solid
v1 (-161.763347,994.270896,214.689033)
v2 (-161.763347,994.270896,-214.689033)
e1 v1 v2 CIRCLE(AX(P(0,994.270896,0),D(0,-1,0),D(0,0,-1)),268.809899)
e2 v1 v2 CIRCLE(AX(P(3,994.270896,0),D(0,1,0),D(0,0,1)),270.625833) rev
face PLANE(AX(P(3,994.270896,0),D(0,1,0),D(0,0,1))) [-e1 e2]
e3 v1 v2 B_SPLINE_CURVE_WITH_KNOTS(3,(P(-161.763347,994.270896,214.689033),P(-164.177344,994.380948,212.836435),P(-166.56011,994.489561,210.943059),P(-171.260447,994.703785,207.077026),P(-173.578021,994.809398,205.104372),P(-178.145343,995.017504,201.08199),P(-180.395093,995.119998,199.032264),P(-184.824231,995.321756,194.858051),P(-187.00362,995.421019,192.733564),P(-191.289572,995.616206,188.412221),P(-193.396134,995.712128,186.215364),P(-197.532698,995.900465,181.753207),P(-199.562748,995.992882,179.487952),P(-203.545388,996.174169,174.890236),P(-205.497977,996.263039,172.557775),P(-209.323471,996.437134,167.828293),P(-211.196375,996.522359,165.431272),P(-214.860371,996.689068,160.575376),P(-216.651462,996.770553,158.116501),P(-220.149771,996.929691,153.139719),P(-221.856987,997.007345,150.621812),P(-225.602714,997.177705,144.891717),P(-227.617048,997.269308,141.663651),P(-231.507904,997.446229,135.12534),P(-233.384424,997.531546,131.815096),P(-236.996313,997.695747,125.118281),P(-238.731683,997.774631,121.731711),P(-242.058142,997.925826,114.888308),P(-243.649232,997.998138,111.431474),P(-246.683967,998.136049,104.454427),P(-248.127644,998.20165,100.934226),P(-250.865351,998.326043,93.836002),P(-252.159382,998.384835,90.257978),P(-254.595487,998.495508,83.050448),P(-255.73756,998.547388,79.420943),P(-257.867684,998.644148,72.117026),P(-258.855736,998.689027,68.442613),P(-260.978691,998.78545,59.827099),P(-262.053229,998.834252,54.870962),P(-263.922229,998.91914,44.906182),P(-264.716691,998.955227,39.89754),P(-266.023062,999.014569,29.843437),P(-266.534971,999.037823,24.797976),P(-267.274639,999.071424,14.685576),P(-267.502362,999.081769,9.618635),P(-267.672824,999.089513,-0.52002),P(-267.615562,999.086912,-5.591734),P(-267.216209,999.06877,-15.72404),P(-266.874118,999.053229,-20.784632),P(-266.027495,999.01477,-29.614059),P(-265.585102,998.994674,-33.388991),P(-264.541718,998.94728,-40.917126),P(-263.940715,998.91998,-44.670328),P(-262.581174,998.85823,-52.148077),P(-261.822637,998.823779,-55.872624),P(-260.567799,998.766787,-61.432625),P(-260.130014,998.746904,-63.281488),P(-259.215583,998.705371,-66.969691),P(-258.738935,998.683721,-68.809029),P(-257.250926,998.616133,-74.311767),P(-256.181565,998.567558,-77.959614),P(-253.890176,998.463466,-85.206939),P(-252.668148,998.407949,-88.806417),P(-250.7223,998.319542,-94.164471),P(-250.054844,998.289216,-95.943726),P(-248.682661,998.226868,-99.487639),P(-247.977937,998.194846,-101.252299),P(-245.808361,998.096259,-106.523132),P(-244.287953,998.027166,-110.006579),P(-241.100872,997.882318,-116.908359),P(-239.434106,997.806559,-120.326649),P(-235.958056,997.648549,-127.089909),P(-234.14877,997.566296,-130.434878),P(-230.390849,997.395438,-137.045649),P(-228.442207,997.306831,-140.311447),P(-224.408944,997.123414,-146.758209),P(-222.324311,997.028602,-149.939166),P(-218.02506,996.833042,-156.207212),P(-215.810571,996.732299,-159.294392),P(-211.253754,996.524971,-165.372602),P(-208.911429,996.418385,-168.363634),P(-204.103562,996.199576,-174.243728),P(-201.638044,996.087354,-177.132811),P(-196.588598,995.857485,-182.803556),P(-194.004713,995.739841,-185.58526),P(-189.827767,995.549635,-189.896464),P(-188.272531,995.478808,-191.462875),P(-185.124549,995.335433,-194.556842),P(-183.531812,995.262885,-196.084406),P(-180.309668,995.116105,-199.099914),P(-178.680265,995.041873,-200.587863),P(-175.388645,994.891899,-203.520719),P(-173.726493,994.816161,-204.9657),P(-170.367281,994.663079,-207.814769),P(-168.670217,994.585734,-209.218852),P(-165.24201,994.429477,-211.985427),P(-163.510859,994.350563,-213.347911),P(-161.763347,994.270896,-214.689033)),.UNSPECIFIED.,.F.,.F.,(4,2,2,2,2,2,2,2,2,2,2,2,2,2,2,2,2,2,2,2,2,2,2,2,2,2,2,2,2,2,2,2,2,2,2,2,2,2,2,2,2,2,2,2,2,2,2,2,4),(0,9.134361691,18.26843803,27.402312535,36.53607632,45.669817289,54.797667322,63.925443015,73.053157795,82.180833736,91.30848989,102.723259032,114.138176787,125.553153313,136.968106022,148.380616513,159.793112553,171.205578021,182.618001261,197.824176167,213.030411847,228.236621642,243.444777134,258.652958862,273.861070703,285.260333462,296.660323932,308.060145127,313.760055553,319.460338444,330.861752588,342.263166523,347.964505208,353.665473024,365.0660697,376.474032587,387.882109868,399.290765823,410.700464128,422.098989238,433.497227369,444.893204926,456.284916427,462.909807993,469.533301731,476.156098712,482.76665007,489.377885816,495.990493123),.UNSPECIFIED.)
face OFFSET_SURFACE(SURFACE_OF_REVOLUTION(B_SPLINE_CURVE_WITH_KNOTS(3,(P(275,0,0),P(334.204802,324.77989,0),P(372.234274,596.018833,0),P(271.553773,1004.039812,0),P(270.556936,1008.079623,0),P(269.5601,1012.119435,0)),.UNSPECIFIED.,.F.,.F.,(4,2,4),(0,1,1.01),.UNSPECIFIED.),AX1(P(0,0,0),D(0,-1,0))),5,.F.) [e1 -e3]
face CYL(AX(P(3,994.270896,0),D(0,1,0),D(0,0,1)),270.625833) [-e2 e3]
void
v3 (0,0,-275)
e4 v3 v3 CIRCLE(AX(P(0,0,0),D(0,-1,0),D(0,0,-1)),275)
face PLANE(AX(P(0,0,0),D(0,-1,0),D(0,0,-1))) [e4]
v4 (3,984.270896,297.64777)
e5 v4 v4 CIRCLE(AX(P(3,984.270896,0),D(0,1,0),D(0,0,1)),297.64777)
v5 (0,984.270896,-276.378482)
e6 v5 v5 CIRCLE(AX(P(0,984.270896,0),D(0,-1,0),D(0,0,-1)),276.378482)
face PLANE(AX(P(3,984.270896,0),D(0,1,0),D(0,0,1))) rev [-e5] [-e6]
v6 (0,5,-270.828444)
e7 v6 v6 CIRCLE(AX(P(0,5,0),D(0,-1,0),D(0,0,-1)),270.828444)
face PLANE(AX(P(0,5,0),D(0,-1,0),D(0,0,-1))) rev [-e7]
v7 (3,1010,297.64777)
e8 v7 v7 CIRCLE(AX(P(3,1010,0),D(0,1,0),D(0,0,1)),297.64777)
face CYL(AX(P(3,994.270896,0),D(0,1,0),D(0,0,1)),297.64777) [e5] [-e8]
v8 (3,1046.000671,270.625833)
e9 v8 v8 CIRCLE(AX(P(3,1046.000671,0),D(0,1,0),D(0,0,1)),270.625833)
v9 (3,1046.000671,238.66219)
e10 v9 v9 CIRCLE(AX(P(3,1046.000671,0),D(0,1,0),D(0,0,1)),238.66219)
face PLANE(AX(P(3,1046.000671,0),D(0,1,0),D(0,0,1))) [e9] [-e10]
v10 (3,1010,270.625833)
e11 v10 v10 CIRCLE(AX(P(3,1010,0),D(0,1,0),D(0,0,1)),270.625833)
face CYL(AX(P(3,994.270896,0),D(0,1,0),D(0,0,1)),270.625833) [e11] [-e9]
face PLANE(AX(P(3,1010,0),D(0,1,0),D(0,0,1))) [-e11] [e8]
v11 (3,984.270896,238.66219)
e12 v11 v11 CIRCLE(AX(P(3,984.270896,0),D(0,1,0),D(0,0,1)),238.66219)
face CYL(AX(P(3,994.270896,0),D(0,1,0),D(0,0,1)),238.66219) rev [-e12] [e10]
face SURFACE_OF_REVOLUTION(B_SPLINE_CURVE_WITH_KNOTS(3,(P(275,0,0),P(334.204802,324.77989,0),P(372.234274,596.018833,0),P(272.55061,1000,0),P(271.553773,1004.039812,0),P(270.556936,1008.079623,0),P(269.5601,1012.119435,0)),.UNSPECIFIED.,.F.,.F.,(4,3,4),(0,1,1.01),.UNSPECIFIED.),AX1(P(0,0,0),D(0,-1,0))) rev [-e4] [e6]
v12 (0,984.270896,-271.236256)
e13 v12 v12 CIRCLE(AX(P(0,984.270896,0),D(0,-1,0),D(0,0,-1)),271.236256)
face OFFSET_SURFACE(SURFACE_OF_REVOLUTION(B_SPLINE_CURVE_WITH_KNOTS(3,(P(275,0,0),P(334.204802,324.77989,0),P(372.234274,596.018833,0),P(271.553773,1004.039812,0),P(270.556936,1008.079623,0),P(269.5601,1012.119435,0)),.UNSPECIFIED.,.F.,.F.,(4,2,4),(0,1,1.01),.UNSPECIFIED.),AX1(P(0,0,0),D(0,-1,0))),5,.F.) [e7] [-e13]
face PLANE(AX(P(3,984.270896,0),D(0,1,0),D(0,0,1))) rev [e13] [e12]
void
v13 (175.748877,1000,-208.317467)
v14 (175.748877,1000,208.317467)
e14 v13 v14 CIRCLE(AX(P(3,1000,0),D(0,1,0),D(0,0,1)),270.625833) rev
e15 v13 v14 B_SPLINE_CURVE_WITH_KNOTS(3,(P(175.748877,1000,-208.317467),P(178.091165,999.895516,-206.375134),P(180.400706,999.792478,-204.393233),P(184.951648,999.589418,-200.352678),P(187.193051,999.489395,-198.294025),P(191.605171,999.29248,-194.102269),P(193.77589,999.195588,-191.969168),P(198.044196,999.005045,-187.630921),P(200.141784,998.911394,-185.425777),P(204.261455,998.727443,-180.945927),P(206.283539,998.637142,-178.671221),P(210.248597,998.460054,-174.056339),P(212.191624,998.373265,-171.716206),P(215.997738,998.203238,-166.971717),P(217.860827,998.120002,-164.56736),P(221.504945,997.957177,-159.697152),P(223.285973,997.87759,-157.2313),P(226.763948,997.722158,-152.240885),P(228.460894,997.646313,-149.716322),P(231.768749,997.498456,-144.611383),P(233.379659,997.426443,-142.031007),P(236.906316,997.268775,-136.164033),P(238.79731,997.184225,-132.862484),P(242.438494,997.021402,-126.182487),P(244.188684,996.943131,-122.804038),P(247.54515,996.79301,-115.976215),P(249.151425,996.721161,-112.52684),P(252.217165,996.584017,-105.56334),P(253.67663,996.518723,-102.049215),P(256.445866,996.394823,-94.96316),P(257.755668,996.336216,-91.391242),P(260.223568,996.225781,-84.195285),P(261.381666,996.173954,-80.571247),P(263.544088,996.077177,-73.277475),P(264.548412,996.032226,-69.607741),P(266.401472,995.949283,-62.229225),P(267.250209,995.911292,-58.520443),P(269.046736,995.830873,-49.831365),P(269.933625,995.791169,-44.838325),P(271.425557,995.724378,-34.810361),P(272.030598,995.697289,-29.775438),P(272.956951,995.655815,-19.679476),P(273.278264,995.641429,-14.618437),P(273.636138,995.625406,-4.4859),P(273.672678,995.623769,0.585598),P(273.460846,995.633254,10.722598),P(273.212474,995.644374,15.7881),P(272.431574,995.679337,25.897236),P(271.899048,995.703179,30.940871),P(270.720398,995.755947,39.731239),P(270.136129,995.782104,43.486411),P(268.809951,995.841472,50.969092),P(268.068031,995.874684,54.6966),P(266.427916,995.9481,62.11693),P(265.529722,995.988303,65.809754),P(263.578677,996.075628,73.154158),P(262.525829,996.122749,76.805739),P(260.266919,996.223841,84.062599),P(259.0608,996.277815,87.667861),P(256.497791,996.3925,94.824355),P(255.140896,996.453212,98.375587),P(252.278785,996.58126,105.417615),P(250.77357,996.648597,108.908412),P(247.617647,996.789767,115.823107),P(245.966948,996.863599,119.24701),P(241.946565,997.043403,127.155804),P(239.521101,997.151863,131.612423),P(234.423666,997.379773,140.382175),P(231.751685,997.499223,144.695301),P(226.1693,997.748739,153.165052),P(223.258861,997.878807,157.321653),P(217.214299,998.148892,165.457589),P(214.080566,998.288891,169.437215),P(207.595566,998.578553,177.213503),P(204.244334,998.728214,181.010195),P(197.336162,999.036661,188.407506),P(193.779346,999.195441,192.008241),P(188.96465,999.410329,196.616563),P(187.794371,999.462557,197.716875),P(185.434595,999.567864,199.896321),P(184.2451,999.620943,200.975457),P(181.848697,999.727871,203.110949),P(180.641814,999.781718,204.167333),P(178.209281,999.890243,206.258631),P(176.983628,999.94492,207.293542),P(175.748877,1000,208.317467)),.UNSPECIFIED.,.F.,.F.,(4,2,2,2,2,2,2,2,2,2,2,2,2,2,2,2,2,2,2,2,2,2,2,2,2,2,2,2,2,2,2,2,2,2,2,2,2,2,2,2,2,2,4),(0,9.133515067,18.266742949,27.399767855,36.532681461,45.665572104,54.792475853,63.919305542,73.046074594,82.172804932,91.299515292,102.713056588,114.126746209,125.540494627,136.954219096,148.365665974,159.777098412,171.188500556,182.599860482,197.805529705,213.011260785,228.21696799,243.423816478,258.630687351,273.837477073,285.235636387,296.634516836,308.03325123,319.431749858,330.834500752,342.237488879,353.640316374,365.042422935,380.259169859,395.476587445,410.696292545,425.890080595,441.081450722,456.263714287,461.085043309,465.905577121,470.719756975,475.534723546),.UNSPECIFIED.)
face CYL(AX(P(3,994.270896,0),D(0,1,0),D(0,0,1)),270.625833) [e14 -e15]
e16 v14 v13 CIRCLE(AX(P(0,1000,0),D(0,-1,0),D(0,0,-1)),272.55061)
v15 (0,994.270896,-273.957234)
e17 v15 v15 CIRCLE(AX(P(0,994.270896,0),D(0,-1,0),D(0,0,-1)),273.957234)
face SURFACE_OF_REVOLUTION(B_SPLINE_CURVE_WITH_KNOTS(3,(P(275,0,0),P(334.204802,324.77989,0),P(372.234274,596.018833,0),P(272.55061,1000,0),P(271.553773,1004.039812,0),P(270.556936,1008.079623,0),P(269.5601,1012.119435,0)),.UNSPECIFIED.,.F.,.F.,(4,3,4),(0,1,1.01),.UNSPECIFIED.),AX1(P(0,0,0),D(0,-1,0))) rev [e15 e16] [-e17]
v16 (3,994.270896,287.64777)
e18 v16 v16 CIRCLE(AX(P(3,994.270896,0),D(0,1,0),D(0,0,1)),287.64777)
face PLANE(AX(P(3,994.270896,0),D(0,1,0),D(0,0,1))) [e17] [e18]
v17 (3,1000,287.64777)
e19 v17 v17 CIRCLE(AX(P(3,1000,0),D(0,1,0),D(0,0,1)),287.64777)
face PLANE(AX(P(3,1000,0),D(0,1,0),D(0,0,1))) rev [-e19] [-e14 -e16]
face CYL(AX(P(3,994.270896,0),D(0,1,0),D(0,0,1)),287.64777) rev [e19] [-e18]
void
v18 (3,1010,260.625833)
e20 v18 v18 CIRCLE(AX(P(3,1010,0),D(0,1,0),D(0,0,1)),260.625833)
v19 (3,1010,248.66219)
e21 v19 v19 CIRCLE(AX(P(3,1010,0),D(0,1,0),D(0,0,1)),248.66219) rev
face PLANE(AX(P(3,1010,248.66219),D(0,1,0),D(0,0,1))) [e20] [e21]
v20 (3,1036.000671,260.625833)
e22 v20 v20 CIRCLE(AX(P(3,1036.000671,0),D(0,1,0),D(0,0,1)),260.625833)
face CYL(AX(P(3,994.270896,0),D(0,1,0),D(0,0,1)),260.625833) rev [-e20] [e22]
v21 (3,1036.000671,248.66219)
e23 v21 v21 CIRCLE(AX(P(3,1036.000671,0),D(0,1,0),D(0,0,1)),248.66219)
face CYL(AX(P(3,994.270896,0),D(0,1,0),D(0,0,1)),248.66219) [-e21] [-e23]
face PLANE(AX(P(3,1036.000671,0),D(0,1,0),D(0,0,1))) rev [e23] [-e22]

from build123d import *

# Parameters (mm, degrees)
SHELL5_T                    = -5
REVOLVE_THIN1_START         = 984.270895849
REVOLVE_THIN1_OUTLINE_R     = 260.625833246
REVOLVE_THIN1_OUTLINE_R_2   = 248.662190358
REVOLVE_THIN1_OUTLINE_R_3   = 238.662190358
REVOLVE_THIN1_DEPTH         = 61.729775532
REVOLVE_THIN1_2_OUTLINE_R   = 297.647770332
REVOLVE_THIN1_2_OUTLINE_R_2 = 287.647770332
REVOLVE_THIN1_2_OUTLINE_R_3 = 260.625833246
REVOLVE_THIN1_2_OUTLINE_R_4 = 248.662190358
REVOLVE_THIN1_2_DEPTH       = 25.729104151
REVOLVE_THIN1_3_OUTLINE_R   = 287.647770332
REVOLVE_THIN1_3_DEPTH       = 10
REVOLVE_THIN1_START_2       = 1000
REVOLVE_THIN1_4_OUTLINE_R   = 287.647770332
REVOLVE_THIN1_4_DEPTH       = 10
REVOLVE_THIN1_START_3       = 1036.000671381
REVOLVE_THIN1_5_OUTLINE_R   = 260.625833246
REVOLVE_THIN1_5_OUTLINE_R_2 = 248.662190358
REVOLVE_THIN1_5_DEPTH       = 10


# Read off the part's stored shape, not the designer's step: Revolve-Thin1
with BuildPart() as part:
    # Sketch1 → Revolve1 (revolve)
    with BuildSketch(Plane.XY):
        with BuildLine():
            Line((0, 0), (275, 0))
            add(Edge.make_bspline(
                [(275, 0), (334.204802315, 324.77989034), (372.23427441, 596.018832728), (272.550609758, 1000)],
                knots=[0, 0, 0, 0, 1, 1, 1, 1], degree=3))
            Line((272.550609758, 1000), (0, 1000))
            Line((0, 1000), (0, 0))
        make_face()
    revolve(axis=Axis((0, 0, 0), (0, 1, 0)))

    # Shell5
    shell5_openings = [part.faces().sort_by_distance(p)[0] for p in [
        (0, 1000, 0),
    ]]
    offset(amount=SHELL5_T, openings=shell5_openings, kind=Kind.INTERSECTION)

    # Revolve-Thin1 outline → Revolve-Thin1 (add)
    # profile 1 of 2: a face of its own
    with BuildSketch(Plane(origin=(0, 0, 0), x_dir=(1, 0, 0), z_dir=(0, 1, 0)).offset(REVOLVE_THIN1_START)):
        with BuildLine():
            ThreePointArc((-161.763347416, -214.689033182), (273.625833246, 0), (-161.763347416, 214.689033182))
            ThreePointArc((-161.763347416, 214.689033182), (-267.625833246, 0), (-161.763347416, -214.689033182))
        make_face()
        with Locations((3, 0)):
            Circle(REVOLVE_THIN1_OUTLINE_R, mode=Mode.SUBTRACT)
    # profile 2 of 2: a face of its own
    with BuildSketch(Plane(origin=(0, 0, 0), x_dir=(1, 0, 0), z_dir=(0, 1, 0)).offset(REVOLVE_THIN1_START)):
        with Locations((3, 0)):
            Circle(REVOLVE_THIN1_OUTLINE_R_2)
        with Locations((3, 0)):
            Circle(REVOLVE_THIN1_OUTLINE_R_3, mode=Mode.SUBTRACT)
    extrude(amount=REVOLVE_THIN1_DEPTH)

    # Revolve-Thin1 2 outline → Revolve-Thin1 2 (add)
    # profile 1 of 2: a face of its own
    with BuildSketch(Plane(origin=(0, 0, 0), x_dir=(1, 0, 0), z_dir=(0, 1, 0)).offset(REVOLVE_THIN1_START)):
        with Locations((3, 0)):
            Circle(REVOLVE_THIN1_2_OUTLINE_R)
        with Locations((3, 0)):
            Circle(REVOLVE_THIN1_2_OUTLINE_R_2, mode=Mode.SUBTRACT)
    # profile 2 of 2: a face of its own
    with BuildSketch(Plane(origin=(0, 0, 0), x_dir=(1, 0, 0), z_dir=(0, 1, 0)).offset(REVOLVE_THIN1_START)):
        with Locations((3, 0)):
            Circle(REVOLVE_THIN1_2_OUTLINE_R_3)
        with Locations((3, 0)):
            Circle(REVOLVE_THIN1_2_OUTLINE_R_4, mode=Mode.SUBTRACT)
    extrude(amount=REVOLVE_THIN1_2_DEPTH)

    # Revolve-Thin1 3 outline → Revolve-Thin1 3 (add)
    with BuildSketch(Plane(origin=(0, 0, 0), x_dir=(1, 0, 0), z_dir=(0, 1, 0)).offset(REVOLVE_THIN1_START)):
        with Locations((3, 0)):
            Circle(REVOLVE_THIN1_3_OUTLINE_R)
        with BuildLine():
            ThreePointArc((-161.763347415, -214.689033181), (-267.625833246, 0), (-161.763347415, 214.689033181))
            ThreePointArc((-161.763347415, 214.689033181), (273.625833246, 0), (-161.763347415, -214.689033181))
        make_face(mode=Mode.SUBTRACT)
    extrude(amount=REVOLVE_THIN1_3_DEPTH)

    # Revolve-Thin1 4 outline → Revolve-Thin1 4 (add)
    with BuildSketch(Plane(origin=(0, 0, 0), x_dir=(1, 0, 0), z_dir=(0, 1, 0)).offset(REVOLVE_THIN1_START_2)):
        with Locations((3, 0)):
            Circle(REVOLVE_THIN1_4_OUTLINE_R)
        with BuildLine():
            ThreePointArc((-161.763347415, -214.689033181), (-267.625833246, 0), (-161.763347415, 214.689033181))
            ThreePointArc((-161.763347415, 214.689033181), (273.625833246, 0), (-161.763347415, -214.689033181))
        make_face(mode=Mode.SUBTRACT)
    extrude(amount=REVOLVE_THIN1_4_DEPTH)

    # Revolve-Thin1 5 outline → Revolve-Thin1 5 (add)
    with BuildSketch(Plane(origin=(0, 0, 0), x_dir=(1, 0, 0), z_dir=(0, 1, 0)).offset(REVOLVE_THIN1_START_3)):
        with Locations((3, 0)):
            Circle(REVOLVE_THIN1_5_OUTLINE_R)
        with Locations((3, 0)):
            Circle(REVOLVE_THIN1_5_OUTLINE_R_2, mode=Mode.SUBTRACT)
    extrude(amount=REVOLVE_THIN1_5_DEPTH)


solid = part.part
